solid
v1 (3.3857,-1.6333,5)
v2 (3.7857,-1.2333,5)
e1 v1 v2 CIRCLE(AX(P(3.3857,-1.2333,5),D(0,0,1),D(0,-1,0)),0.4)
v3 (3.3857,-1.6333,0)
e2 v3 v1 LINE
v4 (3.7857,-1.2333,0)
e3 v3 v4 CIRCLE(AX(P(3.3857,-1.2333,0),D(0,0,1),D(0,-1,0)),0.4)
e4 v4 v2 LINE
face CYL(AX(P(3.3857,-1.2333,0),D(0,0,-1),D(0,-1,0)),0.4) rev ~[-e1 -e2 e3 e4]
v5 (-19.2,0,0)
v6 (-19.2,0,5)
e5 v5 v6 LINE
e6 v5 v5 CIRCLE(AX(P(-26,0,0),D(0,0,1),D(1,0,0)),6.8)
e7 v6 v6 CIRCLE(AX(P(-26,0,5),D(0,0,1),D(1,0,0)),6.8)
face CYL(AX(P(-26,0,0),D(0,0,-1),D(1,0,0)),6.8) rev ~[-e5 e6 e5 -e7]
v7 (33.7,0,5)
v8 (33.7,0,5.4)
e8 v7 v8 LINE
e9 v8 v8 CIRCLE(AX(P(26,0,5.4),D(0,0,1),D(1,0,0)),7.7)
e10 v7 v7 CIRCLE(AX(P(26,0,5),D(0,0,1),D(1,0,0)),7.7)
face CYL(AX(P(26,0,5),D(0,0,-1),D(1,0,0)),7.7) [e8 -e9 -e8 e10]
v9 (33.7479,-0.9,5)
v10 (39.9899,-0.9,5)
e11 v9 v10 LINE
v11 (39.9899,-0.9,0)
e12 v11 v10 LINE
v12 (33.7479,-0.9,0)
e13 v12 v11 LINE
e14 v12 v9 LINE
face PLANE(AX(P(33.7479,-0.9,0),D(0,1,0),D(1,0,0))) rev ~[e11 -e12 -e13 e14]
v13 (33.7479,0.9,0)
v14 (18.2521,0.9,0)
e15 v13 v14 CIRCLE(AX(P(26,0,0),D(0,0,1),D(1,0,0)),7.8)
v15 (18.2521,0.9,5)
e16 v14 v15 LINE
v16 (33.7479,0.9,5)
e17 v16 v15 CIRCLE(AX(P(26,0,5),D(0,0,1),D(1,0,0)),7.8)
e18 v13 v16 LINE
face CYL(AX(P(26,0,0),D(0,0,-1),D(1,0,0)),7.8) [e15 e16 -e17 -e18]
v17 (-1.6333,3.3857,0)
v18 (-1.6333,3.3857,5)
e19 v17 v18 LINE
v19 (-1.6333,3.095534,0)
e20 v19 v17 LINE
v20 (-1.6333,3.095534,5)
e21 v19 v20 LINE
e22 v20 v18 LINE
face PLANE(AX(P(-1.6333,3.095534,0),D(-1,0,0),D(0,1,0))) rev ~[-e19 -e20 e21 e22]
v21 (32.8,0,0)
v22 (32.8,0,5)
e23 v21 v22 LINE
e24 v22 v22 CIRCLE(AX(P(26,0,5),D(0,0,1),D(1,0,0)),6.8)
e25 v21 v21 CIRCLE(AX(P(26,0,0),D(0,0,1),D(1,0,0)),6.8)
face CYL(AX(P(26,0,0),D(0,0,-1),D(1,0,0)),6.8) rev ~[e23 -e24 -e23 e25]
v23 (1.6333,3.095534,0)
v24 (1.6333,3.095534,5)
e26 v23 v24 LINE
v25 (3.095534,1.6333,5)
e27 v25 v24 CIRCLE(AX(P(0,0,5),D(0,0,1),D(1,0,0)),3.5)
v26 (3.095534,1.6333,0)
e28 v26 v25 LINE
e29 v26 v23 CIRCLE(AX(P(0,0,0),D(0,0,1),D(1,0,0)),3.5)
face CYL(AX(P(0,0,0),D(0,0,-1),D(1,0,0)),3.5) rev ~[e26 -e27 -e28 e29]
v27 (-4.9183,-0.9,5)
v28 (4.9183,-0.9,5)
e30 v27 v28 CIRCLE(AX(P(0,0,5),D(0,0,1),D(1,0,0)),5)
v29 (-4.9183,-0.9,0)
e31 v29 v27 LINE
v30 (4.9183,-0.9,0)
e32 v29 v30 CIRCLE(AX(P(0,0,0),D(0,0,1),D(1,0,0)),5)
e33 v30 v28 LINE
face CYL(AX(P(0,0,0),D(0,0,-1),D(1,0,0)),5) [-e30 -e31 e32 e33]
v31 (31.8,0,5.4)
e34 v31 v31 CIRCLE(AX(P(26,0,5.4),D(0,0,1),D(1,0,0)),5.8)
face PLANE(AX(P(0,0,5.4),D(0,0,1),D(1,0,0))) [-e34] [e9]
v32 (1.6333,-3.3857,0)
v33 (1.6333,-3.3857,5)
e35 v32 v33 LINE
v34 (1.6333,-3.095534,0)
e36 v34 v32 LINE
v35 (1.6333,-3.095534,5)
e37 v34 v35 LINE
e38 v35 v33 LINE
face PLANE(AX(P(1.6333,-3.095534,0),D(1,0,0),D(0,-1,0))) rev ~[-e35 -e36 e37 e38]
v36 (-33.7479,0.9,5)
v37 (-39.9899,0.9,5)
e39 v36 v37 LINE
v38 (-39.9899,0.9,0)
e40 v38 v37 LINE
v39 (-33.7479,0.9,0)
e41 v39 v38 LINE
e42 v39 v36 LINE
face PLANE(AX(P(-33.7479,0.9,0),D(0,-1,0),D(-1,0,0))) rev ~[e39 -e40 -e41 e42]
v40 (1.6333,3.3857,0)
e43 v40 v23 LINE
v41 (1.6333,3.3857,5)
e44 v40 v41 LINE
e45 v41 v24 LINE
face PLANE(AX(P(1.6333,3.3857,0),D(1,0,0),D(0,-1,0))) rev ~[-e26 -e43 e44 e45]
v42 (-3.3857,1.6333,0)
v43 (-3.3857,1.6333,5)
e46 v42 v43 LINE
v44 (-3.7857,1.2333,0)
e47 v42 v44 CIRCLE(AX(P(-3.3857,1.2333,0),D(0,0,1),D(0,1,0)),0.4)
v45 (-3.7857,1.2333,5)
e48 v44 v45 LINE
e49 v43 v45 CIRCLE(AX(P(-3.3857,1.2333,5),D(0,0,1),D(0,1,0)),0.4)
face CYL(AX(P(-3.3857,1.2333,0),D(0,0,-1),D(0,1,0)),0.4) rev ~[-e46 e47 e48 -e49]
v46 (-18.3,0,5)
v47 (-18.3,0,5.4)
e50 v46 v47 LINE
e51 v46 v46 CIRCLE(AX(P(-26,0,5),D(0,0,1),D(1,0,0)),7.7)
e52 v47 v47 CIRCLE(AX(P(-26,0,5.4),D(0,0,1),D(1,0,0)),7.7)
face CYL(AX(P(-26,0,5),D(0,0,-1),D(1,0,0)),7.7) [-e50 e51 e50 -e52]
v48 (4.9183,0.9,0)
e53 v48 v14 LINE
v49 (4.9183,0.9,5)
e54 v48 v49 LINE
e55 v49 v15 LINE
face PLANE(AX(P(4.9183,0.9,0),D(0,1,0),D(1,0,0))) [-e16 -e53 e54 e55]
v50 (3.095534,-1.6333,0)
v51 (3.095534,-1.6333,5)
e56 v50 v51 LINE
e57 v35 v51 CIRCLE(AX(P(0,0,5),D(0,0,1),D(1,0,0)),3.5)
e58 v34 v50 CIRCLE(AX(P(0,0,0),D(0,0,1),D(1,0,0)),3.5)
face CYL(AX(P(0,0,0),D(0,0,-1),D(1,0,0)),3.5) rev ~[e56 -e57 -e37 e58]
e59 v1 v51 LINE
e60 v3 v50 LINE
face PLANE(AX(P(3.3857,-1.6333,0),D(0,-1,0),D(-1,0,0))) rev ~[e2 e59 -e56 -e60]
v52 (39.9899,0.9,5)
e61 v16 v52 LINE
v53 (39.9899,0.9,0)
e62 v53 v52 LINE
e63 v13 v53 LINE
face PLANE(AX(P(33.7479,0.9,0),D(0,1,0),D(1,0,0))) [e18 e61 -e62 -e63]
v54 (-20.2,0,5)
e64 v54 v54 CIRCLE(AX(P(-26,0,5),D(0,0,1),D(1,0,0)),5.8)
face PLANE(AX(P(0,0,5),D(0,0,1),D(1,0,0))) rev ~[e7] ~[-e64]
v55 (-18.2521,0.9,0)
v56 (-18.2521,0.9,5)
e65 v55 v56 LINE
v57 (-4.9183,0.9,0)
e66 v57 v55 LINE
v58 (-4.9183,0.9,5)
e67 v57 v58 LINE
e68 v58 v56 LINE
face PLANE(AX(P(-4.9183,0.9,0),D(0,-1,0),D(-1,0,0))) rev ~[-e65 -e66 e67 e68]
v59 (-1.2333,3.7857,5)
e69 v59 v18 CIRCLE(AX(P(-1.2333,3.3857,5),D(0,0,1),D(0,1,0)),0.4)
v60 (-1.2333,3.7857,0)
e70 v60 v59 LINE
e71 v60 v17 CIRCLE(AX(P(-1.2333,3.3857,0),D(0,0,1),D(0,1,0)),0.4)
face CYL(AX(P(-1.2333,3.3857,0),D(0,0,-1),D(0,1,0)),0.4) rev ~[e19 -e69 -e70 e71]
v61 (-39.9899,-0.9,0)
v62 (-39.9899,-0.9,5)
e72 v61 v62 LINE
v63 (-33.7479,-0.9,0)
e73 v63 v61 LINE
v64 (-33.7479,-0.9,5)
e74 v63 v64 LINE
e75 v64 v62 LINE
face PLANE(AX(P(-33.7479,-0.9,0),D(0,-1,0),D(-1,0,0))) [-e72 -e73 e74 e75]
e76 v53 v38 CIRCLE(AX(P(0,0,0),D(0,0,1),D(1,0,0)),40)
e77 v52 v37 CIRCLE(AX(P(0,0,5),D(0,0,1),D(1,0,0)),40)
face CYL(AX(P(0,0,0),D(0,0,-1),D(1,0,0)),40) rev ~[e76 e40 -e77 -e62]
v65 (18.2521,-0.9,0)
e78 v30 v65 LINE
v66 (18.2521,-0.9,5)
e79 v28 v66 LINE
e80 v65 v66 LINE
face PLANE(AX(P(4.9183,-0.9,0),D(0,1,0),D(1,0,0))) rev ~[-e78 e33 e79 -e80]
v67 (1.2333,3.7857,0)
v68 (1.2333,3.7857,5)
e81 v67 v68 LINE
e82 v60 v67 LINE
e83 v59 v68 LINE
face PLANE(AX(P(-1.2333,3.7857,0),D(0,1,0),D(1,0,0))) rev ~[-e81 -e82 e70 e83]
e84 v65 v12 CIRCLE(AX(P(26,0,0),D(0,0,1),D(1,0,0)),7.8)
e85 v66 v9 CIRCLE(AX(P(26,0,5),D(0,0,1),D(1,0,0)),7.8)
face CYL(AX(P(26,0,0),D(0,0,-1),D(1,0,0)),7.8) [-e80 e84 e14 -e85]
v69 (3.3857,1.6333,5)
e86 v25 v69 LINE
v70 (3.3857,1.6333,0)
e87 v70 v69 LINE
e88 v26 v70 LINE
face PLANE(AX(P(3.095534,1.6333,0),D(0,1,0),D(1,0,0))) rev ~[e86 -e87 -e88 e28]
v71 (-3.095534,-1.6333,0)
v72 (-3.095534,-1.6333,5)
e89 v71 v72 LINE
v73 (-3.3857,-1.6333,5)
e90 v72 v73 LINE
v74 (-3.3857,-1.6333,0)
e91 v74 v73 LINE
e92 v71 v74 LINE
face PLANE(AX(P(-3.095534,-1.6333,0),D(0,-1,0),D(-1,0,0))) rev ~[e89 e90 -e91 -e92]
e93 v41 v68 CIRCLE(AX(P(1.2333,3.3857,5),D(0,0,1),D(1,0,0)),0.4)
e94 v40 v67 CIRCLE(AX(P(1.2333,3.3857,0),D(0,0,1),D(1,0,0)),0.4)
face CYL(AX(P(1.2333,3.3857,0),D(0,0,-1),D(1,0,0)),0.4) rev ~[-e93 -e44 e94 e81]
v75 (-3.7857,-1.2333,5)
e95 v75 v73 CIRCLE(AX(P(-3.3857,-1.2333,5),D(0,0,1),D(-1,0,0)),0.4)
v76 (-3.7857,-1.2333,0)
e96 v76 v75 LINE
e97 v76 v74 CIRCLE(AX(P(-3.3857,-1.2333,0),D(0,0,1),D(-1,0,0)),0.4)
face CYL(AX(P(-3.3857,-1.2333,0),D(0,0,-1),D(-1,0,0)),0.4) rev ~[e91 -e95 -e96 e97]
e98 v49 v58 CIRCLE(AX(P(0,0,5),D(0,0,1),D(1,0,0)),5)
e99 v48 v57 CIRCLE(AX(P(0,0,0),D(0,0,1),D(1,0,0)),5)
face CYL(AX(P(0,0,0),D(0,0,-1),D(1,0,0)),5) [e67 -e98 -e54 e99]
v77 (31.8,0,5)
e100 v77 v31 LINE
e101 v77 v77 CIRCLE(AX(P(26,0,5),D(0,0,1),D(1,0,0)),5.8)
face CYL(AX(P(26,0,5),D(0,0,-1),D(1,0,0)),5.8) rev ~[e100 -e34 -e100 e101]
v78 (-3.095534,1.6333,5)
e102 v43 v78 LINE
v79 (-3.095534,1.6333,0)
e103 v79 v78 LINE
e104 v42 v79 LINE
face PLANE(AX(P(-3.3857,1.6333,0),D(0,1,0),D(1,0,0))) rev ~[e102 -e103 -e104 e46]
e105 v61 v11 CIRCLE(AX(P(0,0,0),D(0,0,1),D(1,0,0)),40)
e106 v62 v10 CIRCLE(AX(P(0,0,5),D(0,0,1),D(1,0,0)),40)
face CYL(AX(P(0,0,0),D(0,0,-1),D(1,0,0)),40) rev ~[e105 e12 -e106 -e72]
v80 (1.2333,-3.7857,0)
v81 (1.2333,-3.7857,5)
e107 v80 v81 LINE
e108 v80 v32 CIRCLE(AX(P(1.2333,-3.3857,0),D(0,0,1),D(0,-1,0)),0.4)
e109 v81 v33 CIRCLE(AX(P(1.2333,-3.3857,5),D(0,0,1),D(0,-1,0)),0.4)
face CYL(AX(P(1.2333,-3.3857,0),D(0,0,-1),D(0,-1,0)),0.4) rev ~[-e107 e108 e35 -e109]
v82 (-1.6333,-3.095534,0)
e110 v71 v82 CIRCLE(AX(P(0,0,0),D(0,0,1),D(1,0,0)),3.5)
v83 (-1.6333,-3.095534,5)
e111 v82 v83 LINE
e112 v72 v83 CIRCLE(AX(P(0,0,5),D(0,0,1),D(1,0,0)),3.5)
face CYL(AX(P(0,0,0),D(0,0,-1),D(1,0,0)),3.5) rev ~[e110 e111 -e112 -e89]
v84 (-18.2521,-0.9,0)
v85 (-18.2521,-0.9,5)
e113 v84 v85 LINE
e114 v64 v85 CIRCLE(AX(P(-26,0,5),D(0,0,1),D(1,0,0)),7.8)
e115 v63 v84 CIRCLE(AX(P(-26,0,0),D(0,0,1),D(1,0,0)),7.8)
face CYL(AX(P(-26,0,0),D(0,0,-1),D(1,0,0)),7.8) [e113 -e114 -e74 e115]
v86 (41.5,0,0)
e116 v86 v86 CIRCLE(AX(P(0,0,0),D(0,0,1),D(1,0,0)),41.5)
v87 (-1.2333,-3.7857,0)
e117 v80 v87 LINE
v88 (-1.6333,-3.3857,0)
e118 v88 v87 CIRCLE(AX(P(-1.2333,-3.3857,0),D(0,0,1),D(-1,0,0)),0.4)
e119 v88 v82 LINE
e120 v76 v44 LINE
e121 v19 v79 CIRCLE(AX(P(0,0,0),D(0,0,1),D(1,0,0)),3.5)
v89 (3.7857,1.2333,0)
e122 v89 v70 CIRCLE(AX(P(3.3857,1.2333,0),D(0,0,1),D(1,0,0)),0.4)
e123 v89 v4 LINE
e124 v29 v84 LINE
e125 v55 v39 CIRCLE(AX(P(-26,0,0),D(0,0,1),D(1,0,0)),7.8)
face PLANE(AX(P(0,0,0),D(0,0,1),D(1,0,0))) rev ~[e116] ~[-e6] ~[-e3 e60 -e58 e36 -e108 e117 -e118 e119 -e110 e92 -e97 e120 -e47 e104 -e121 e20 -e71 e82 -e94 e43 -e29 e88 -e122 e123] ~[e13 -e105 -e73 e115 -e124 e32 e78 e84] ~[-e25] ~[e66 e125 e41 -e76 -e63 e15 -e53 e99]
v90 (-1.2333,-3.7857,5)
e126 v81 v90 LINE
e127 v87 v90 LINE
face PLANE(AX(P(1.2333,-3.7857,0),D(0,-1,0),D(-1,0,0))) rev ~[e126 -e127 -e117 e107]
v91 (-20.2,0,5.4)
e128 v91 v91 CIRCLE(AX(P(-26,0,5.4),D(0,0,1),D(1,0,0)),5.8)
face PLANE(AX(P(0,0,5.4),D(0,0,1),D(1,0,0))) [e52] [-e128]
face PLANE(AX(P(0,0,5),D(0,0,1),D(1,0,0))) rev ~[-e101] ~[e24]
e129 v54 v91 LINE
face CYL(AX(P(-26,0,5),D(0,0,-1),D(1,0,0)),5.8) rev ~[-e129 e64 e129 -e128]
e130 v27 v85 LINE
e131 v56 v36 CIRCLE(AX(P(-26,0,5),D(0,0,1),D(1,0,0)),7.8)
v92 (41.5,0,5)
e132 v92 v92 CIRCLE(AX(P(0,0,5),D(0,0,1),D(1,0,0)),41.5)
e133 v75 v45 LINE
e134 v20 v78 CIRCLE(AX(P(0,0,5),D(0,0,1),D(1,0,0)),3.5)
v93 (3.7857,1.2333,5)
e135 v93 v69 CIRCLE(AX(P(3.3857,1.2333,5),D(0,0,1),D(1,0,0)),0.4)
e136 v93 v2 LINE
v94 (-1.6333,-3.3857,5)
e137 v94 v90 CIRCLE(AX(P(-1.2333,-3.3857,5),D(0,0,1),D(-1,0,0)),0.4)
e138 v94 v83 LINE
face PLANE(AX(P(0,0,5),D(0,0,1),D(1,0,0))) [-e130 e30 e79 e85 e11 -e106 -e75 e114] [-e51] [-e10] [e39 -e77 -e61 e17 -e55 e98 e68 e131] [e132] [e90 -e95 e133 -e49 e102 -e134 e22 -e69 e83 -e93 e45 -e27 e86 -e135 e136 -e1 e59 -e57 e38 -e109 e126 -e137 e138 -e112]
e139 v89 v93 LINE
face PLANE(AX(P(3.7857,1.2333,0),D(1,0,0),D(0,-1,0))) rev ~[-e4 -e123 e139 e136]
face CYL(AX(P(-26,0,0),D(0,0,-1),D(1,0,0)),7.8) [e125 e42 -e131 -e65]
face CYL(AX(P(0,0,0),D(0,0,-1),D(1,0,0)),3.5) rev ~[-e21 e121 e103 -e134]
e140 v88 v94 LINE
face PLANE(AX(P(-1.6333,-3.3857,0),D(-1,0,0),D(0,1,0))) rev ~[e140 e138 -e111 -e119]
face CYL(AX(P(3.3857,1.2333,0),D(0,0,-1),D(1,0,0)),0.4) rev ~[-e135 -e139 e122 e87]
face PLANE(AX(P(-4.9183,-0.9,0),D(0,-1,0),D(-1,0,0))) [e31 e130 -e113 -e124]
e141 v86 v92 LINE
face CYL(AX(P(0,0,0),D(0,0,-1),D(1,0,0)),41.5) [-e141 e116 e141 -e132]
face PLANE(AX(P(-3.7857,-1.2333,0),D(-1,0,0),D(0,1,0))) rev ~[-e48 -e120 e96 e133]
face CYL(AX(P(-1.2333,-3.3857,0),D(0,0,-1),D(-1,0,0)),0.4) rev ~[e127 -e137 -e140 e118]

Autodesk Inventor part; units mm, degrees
ref_plane "YZ Plane" through (0, 0, 0) normal (1, 0, 0) x (0, 1, 0)
ref_plane "XZ Plane" through (0, 0, 0) normal (0, 1, 0) x (-1, 0, 0)
ref_plane "XY Plane" through (0, 0, 0) normal (0, 0, 1) x (1, 0, 0)
sketch "Sketch1" plane through (0, 0, 0) normal (0, 0, 1) x (1, 0, 0)
  circle A0 centre (0, 0) radius 40
  circle A1 centre (0, 0) radius 41.5
  circle A2 centre (0, 0) radius 3.5
  circle A3 centre (0, 0) radius 5
  circle A4 centre (26, 0) radius 6.8
  circle A5 centre (26, 0) radius 7.8
  line L0 (0, 0) -> (43.8957, 0) construction
  line L1 (4.9183, 0.9) -> (18.2521, 0.9)
  line L2 (33.7479, 0.9) -> (39.9899, 0.9)
  line L3 (4.9183, -0.9) -> (18.2521, -0.9)
  line L4 (33.7479, -0.9) -> (39.9899, -0.9)
  line L5 (-4.9183, -0.9) -> (-18.2521, -0.9)
  line L6 (-4.9183, 0.9) -> (-18.2521, 0.9)
  circle A6 centre (-26, 0) radius 7.8
  circle A7 centre (-26, 0) radius 6.8
  line L7 (-33.7479, 0.9) -> (-39.9899, 0.9)
  line L8 (-33.7479, -0.9) -> (-39.9899, -0.9)
  line L9 (1.2333, -3.7857) -> (-1.2333, -3.7857)
  line L10 (-1.6333, -3.3857) -> (-1.6333, 3.3857)
  line L11 (-1.2333, 3.7857) -> (1.2333, 3.7857)
  line L12 (1.6333, 3.3857) -> (1.6333, -3.3857)
  line L13 (1.6333, -3.7857) -> (-1.6333, 3.7857) construction
  line L14 (-1.6333, -3.7857) -> (1.6333, 3.7857) construction
  arc A8 (-1.2333, 3.7857) -> (-1.6333, 3.3857) centre (-1.2333, 3.3857) ccw
  arc A9 (1.6333, 3.3857) -> (1.2333, 3.7857) centre (1.2333, 3.3857) ccw
  arc A10 (1.2333, -3.7857) -> (1.6333, -3.3857) centre (1.2333, -3.3857) ccw
  arc A11 (-1.6333, -3.3857) -> (-1.2333, -3.7857) centre (-1.2333, -3.3857) ccw
  line L15 (3.3857, -1.6333) -> (-3.3857, -1.6333)
  line L16 (-3.7857, -1.2333) -> (-3.7857, 1.2333)
  line L17 (-3.3857, 1.6333) -> (3.3857, 1.6333)
  line L18 (3.7857, 1.2333) -> (3.7857, -1.2333)
  line L19 (3.7857, -1.6333) -> (-3.7857, 1.6333) construction
  line L20 (-3.7857, -1.6333) -> (3.7857, 1.6333) construction
  arc A12 (-3.3857, 1.6333) -> (-3.7857, 1.2333) centre (-3.3857, 1.2333) ccw
  arc A13 (3.7857, 1.2333) -> (3.3857, 1.6333) centre (3.3857, 1.2333) ccw
  arc A14 (3.3857, -1.6333) -> (3.7857, -1.2333) centre (3.3857, -1.2333) ccw
  arc A15 (-3.7857, -1.2333) -> (-3.3857, -1.6333) centre (-3.3857, -1.2333) ccw
  point P0 (-4.9183, -0.9)
  point P1 (4.9183, -0.9)
  point P2 (-1.6333, -3.0955)
  point P3 (-1.6333, 3.0955)
  point P4 (1.6333, 3.0955)
  point P5 (1.6333, -3.0955)
  point P6 (-4.9183, 0.9)
  point P7 (-33.7479, 0.9)
  point P8 (-3.0955, -1.6333)
  point P9 (-3.0955, 1.6333)
  point P10 (3.0955, 1.6333)
  point P11 (3.0955, -1.6333)
  dimension "d0" = 80
  dimension "d3" = 10
  dimension "d1" = 83
  dimension "d2" = 7
  dimension "d4" = 13.6
  dimension "d5" = 26
  dimension "d6" = 15.6
  dimension "d10" = 0.9
  dimension "d11" = 0.9
  dimension "d14" = 360
  dimension "d16" = 7.5714
  dimension "d17" = 3.2667
  dimension "d18" = 0.4
  dimension "d29" = 7.5714
  dimension "d30" = 3.2667
  dimension "d31" = 0.4
extrude "Extrusion1" add sketch "Sketch1" along normal blind 5 contours A0 L4 A5 L2 | L7 A6 L8 A0 | A5 | A6 | A5 L3 A3 L1 | L6 A3 L5 A6 | A3 | A1
sketch "Sketch2" plane through (0, 0, 5) normal (0, 0, 1) x (1, 0, 0)
  arc A0 (33.7479, 0.9) -> (18.2521, 0.9) centre (26, 0) ccw projected
  circle A1 centre (26, 0) radius 7.7
  circle A2 centre (26, 0) radius 5.8
  arc A3 (18.2521, -0.9) -> (33.7479, -0.9) centre (26, 0) ccw projected
  circle A4 centre (-26, 0) radius 5.8
  circle A5 centre (-26, 0) radius 7.7
  point P0 (0, 0)
  point P1 (18.3528, 0.9)
  point P2 (33.6472, 0.9)
  point P3 (-18.2521, 0.9)
  point P4 (-33.7479, 0.9)
  point P5 (18.7723, -2.9327)
  dimension "d21" = 7.8
  dimension "d22" = 11.6
  dimension "d27" = 360
extrude "Extrusion2" add sketch "Sketch2" along normal blind 0.4
equation "\"d0\" = D_yttreRing_i"
equation "\"d3\" = D_axel + d_axelRing"
equation "\"d1\" = D_yttreRing_i + d_yttreRing"
equation "\"d2\" = D_axel"
equation "\"d4\" = D_magnet + d_toleransRing"
equation "\"d5\" = l_magnetHållarRingFrånOrigo"
equation "\"d6\" = d_toleransRing + D_magnet + d_magnetHållarRing"
equation "\"d10\" = 0.5 * d_stöttor"
equation "\"d11\" = 0.5 * d_stöttor"
equation "\"d18\" = r_filletAxel"
equation "\"d31\" = r_filletAxel"
equation "\"d19\" = h_höjdMagnetRotor"
equation "\"d22\" = D_magnet - d_magnetSkydd"
equation "\"d23\" = h_magnetSkydd"
equation "\"D_yttreRing_i\" = 80"
equation "\"d_yttreRing\" = 3"
equation "\"D_magnet\" = 13"
equation "\"D_axel\" = 7"
equation "\"d_axelRing\" = 3"
equation "\"h_höjdMagnetRotor\" = 5"
equation "\"d_stöttor\" = 1.8"
equation "\"d_toleransRing\" = 0.6"
equation "\"d_magnetHållarRing\" = 2"
equation "\"l_magnetHållarRingFrånOrigo\" = 26"
equation "\"r_filletAxel\" = 0.4"
equation "\"h_magnetSkydd\" = 0.4"
equation "\"d_magnetSkydd\" = 1.4"
properties part number "Magnet_rotor_parametriserad_02"
